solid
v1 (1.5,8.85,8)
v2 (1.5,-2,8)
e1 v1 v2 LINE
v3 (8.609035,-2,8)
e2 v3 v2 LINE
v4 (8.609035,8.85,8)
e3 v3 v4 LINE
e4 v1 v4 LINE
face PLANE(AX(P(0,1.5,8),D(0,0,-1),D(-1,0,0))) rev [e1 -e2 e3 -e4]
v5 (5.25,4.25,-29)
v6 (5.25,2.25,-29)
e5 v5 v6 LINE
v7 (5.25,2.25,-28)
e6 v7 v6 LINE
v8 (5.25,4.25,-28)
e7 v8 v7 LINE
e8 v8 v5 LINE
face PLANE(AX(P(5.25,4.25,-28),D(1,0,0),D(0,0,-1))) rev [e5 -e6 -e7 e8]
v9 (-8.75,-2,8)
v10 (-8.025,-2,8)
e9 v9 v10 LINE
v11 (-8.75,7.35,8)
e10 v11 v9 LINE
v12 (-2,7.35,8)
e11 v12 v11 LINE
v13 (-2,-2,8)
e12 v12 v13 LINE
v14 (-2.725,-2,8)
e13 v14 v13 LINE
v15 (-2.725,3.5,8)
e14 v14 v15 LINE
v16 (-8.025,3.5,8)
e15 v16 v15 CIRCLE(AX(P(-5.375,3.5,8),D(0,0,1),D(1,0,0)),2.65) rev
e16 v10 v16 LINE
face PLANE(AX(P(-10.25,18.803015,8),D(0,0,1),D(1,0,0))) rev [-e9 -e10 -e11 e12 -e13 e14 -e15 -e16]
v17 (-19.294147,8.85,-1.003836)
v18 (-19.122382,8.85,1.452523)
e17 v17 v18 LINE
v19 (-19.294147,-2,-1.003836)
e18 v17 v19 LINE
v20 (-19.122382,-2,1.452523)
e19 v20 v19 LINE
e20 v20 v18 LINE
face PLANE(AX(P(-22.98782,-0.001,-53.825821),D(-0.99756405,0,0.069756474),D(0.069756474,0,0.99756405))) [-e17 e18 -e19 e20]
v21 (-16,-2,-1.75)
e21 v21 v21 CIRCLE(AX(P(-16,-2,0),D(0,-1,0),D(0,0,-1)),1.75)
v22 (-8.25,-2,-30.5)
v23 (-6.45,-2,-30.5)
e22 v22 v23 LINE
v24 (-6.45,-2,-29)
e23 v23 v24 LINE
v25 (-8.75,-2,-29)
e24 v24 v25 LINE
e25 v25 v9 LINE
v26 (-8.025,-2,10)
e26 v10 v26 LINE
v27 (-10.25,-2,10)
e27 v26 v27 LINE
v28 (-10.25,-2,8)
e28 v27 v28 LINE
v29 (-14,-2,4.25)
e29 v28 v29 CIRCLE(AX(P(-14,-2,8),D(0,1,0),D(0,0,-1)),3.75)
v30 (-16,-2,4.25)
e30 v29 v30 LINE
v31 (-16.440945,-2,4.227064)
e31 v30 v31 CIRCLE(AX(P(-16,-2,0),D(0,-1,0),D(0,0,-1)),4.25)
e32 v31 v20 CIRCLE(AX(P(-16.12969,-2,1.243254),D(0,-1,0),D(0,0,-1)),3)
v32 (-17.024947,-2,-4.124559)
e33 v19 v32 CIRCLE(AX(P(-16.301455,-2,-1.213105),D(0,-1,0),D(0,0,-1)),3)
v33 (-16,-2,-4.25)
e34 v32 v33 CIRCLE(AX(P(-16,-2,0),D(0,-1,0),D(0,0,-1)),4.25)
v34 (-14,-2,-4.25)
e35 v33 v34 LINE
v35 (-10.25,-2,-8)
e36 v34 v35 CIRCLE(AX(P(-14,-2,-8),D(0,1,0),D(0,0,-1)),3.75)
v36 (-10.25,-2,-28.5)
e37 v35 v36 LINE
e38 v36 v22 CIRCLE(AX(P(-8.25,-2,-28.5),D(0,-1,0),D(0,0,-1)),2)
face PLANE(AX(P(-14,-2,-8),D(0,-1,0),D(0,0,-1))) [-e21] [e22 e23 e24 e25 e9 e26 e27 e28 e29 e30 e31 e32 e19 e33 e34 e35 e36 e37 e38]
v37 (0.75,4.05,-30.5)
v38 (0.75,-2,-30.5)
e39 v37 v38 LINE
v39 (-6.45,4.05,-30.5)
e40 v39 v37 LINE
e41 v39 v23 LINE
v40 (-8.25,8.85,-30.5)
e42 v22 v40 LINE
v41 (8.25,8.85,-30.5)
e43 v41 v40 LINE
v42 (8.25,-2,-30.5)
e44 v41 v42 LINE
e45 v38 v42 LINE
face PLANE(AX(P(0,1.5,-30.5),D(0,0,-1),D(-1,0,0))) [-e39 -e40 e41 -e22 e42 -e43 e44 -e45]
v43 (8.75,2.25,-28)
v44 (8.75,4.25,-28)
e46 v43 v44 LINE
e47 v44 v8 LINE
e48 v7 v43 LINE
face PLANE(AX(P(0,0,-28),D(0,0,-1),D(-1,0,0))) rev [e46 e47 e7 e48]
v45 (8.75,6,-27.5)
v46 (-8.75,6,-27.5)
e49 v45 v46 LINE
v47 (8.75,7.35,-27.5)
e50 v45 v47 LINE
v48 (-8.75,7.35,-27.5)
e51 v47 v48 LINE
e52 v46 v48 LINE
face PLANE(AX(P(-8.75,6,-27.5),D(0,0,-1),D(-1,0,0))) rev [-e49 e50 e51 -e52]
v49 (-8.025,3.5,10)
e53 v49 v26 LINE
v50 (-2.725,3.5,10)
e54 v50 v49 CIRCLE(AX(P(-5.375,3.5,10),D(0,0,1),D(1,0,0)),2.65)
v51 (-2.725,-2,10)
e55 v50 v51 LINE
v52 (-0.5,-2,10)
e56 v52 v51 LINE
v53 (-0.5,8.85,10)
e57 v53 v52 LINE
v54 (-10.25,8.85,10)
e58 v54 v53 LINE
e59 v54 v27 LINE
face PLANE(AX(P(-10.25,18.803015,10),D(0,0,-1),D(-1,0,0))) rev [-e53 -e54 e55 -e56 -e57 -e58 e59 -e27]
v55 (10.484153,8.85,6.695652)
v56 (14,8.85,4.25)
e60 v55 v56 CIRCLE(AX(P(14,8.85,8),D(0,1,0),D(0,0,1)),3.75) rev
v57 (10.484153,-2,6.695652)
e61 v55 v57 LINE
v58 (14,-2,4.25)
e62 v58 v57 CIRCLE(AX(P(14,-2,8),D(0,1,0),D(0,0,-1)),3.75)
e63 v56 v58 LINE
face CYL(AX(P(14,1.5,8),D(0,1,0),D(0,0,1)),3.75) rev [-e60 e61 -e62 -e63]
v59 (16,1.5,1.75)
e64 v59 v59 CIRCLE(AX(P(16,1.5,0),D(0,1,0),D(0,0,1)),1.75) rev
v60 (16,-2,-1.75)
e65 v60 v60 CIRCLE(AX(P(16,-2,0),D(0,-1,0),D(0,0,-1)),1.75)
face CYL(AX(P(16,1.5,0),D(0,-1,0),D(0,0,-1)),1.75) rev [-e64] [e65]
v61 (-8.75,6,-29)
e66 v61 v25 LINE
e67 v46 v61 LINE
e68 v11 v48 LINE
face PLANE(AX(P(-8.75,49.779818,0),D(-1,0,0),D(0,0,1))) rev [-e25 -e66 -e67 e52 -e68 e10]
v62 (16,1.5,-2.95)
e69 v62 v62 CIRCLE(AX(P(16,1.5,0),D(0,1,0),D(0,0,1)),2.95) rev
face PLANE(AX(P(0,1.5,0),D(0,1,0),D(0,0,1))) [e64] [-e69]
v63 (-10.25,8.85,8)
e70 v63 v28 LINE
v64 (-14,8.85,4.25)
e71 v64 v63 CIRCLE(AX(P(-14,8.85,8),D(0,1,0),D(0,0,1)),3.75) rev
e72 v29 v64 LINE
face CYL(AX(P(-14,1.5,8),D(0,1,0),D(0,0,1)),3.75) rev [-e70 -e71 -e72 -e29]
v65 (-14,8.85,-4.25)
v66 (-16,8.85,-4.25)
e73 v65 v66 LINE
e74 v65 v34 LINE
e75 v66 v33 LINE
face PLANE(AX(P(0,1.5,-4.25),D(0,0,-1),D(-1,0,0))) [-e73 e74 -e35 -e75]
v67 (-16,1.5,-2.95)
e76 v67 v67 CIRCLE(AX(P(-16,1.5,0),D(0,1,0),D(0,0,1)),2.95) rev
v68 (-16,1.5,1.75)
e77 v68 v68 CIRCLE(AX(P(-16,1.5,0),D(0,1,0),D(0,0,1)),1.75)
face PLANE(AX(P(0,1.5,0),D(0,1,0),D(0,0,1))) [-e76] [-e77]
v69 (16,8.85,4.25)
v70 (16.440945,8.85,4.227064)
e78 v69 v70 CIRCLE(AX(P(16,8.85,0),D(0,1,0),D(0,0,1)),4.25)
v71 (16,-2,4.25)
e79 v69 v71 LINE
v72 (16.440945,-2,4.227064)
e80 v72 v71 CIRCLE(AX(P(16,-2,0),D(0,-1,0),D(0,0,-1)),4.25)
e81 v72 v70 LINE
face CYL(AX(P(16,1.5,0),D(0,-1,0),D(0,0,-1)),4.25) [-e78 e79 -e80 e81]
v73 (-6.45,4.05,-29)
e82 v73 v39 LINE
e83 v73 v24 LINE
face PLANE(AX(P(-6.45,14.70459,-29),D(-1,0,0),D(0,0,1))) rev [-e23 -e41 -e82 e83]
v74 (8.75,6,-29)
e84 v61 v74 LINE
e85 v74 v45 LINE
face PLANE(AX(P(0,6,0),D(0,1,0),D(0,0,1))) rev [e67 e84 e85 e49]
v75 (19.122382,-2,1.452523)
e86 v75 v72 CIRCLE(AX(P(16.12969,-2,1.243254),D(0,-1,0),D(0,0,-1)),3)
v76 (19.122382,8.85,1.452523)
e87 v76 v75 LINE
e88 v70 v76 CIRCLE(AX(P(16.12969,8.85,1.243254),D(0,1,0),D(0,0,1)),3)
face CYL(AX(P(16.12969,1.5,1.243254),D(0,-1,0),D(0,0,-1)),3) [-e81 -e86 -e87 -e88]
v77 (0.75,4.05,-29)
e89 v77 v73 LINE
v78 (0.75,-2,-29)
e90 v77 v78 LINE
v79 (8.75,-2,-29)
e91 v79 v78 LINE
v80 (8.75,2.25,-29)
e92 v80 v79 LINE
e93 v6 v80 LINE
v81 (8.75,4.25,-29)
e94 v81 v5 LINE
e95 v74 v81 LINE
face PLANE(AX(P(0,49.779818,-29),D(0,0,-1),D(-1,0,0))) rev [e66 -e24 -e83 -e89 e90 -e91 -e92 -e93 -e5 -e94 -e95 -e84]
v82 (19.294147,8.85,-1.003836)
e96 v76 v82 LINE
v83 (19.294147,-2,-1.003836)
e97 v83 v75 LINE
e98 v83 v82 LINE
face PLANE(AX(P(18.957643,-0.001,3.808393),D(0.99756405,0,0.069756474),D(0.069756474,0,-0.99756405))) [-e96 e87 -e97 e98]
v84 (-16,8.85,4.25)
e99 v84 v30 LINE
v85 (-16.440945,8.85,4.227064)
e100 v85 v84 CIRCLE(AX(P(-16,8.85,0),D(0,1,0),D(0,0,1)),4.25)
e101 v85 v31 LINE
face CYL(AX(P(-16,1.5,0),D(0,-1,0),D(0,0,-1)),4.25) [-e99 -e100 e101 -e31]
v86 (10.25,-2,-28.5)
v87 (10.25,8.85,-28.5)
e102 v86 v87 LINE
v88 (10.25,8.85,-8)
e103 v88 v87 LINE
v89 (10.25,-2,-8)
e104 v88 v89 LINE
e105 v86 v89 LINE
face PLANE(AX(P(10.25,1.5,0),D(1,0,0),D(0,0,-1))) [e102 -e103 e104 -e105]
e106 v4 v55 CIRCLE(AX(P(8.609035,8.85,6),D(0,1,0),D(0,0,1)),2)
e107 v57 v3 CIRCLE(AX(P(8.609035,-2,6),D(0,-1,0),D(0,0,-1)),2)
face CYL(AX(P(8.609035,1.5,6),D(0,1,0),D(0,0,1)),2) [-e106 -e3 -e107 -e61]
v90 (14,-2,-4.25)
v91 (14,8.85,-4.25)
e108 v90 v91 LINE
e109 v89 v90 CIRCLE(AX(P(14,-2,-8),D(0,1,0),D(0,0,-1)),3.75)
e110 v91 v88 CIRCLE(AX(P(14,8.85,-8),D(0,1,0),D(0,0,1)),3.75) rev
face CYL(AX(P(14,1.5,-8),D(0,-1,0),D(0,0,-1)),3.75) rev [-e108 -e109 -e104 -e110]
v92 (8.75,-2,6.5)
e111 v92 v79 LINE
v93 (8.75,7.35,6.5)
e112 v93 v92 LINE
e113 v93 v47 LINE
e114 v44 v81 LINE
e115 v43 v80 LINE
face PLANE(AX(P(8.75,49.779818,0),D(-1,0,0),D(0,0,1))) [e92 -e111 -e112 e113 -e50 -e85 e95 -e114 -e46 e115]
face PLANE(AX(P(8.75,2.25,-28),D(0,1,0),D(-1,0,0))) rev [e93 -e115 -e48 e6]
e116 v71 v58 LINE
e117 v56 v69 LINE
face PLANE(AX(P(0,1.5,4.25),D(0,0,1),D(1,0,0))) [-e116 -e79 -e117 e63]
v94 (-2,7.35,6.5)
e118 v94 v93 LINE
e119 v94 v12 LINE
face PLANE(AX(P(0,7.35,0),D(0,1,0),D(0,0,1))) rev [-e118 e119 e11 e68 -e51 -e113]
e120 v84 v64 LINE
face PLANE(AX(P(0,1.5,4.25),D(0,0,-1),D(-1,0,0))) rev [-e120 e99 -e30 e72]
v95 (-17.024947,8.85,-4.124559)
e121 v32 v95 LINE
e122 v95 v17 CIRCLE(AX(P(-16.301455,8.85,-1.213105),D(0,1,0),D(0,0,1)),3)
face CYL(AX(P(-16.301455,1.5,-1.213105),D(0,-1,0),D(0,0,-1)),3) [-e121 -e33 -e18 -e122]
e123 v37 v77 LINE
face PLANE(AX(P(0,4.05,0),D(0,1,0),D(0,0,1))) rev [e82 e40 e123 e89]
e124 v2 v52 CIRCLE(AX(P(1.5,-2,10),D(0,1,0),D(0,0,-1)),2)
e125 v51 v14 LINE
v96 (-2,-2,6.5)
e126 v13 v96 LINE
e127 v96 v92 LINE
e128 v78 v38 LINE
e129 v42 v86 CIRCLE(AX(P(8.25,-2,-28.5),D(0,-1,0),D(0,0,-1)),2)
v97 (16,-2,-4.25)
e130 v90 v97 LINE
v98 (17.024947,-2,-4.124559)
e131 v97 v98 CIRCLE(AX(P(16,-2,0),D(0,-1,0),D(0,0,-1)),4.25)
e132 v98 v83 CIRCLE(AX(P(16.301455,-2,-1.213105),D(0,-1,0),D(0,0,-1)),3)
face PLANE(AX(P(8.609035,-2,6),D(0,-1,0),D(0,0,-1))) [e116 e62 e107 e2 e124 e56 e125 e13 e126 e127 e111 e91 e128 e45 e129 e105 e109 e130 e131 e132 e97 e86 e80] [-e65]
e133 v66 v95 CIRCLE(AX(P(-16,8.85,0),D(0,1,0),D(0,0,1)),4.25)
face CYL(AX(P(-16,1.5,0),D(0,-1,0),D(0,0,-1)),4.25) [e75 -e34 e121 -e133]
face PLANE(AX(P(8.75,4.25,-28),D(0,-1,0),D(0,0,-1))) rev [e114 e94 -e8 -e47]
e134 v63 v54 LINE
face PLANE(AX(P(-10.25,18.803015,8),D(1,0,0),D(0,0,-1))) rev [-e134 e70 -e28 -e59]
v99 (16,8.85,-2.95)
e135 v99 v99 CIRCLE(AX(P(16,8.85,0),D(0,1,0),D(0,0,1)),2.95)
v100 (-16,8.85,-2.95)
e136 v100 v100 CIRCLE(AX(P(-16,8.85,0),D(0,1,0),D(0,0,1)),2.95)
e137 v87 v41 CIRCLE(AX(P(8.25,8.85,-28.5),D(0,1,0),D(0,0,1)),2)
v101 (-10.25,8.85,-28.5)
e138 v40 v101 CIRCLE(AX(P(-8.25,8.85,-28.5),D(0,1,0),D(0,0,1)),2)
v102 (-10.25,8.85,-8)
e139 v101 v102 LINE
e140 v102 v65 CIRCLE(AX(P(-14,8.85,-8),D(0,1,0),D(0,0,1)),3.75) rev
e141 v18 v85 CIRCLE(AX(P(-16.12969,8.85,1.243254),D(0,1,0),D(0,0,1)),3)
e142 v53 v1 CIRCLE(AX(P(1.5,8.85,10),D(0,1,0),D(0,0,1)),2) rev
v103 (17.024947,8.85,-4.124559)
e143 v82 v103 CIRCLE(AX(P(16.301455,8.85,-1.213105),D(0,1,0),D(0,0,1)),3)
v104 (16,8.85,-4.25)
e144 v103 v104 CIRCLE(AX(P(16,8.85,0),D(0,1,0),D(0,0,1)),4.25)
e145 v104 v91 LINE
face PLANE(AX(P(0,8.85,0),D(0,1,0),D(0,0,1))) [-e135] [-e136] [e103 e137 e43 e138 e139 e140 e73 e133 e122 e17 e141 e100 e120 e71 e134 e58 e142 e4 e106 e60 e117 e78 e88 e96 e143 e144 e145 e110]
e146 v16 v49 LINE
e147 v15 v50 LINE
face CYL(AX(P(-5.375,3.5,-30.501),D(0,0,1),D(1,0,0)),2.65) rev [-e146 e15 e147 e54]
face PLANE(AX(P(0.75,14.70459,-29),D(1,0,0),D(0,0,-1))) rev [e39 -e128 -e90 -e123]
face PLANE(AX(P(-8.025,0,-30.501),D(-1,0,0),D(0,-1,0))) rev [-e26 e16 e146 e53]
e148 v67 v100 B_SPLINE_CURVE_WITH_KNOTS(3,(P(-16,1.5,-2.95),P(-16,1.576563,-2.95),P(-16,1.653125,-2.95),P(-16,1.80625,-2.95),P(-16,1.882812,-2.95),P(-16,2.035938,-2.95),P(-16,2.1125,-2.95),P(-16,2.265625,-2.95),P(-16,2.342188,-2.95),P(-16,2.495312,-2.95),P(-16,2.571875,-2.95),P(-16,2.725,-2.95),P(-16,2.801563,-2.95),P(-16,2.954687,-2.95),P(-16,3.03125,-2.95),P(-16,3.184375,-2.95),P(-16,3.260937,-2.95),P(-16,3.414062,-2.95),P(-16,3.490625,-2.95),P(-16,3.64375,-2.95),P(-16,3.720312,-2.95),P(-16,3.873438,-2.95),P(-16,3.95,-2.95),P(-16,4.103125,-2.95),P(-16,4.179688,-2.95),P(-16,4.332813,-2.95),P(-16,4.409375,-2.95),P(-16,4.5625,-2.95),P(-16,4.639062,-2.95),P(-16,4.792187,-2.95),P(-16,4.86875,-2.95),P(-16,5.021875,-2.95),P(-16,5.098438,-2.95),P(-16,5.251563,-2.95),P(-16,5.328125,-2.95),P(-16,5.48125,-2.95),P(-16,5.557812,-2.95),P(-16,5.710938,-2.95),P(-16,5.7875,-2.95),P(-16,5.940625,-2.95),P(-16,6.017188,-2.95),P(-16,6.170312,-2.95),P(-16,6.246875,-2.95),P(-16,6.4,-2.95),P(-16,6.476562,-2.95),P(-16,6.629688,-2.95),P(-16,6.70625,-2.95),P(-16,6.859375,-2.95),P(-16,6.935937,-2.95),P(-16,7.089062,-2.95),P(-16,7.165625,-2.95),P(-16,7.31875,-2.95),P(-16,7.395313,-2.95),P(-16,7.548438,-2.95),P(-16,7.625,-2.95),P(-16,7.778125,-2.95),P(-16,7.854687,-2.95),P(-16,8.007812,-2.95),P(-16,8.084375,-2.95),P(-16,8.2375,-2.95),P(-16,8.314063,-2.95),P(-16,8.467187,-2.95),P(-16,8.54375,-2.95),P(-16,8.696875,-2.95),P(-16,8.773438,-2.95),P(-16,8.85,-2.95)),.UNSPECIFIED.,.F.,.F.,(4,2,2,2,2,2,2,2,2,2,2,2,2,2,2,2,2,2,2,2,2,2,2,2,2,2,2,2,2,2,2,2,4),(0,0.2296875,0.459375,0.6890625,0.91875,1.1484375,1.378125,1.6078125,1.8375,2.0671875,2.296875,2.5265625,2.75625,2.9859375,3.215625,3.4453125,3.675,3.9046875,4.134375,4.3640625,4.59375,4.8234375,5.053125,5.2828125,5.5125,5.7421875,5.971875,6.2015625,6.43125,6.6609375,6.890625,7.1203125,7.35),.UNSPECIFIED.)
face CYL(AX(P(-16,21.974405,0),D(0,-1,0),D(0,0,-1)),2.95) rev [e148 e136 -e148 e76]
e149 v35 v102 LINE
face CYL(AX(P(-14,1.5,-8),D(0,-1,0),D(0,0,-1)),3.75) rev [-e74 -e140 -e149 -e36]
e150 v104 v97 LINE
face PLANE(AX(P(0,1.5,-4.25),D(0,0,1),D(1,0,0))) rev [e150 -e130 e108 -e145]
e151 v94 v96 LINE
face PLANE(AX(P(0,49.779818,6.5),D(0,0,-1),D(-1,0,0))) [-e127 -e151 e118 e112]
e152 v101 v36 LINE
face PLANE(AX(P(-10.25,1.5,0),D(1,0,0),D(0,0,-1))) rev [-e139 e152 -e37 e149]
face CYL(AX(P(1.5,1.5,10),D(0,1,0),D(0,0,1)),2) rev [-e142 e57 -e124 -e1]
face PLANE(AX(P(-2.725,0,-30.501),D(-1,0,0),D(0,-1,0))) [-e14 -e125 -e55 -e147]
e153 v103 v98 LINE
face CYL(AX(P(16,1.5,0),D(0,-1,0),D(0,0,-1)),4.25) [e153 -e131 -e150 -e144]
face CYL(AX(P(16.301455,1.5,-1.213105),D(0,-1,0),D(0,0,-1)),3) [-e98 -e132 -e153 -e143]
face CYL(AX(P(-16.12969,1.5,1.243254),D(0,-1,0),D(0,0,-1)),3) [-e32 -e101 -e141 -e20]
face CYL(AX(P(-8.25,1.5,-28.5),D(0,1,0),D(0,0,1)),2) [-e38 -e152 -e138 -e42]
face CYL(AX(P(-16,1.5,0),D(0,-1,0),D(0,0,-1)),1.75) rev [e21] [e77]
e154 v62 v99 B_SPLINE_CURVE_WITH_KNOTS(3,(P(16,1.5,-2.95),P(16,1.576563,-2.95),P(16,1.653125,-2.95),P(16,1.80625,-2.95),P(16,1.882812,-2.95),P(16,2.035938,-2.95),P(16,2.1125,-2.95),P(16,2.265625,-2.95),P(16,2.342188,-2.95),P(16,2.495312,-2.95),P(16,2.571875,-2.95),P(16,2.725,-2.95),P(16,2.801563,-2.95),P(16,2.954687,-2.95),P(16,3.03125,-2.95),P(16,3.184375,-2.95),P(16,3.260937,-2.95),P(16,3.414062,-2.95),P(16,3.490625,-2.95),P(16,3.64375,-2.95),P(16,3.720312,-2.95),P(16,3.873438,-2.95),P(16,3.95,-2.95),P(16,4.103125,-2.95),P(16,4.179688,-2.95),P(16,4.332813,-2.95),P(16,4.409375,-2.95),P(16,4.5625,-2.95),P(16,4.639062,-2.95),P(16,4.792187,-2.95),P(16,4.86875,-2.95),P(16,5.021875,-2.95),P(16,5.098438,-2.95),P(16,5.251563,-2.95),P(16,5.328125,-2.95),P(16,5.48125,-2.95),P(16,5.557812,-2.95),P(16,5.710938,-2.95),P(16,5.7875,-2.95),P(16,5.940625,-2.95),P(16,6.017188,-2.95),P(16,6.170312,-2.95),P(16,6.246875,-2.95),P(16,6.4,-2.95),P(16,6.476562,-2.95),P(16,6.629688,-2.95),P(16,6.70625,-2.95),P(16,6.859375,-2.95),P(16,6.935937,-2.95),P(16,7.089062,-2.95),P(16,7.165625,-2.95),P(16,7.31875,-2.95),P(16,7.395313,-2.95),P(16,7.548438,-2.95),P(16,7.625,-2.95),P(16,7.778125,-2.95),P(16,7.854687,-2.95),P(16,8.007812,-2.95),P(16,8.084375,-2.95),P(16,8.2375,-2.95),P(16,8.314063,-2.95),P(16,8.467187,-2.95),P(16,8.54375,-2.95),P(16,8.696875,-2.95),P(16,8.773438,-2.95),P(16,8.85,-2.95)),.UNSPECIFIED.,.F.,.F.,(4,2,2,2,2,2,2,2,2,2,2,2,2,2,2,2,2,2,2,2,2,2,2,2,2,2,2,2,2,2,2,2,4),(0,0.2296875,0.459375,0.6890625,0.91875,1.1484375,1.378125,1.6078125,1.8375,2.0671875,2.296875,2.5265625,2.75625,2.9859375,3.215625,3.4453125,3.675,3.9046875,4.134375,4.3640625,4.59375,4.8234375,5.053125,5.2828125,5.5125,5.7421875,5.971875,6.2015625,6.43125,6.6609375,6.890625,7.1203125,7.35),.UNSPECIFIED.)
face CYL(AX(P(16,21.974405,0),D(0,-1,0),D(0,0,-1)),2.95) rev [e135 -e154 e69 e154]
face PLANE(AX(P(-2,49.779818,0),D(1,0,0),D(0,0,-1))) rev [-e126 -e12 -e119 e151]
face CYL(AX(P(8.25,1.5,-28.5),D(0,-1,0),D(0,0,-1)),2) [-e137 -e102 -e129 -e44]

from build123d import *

# Parameters (mm, degrees)
SKETCH1_W           = 20.5
SKETCH1_H           = 38.5
SKETCH1_R           = 4.25
SKETCH1_R_2         = 1.75
BOSS_EXTRUDE1_DEPTH = 1.5
SKETCH2_W           = 20.5
SKETCH2_H           = 38.5
BOSS_EXTRUDE2_DEPTH = 7.35
SKETCH3_W           = 17.5
SKETCH3_H           = 35.5
SKETCH3_W_2         = 6.75
SKETCH3_H_2         = 1.5
CUT_EXTRUDE1_DEPTH  = 7.35
SKETCH4_W           = 7.2
SKETCH4_H           = 1.5
CUT_EXTRUDE2_DEPTH  = 4.05
SKETCH6_W           = 17.5
SKETCH6_H           = 1.5
BOSS_EXTRUDE3_DEPTH = 1.35
SKETCH7_W           = 3.5
SKETCH7_H           = 2
BOSS_EXTRUDE4_DEPTH = 1
SKETCH8_R           = 2.95
BOSS_EXTRUDE5_DEPTH = 7.35
FILLET2_R           = 3.75
CUT_EXTRUDE4_START  = -8.85
CUT_EXTRUDE4_DEPTH  = 8.85
FILLET5_R           = 3
SKETCH10_W          = 9.75
SKETCH10_H          = 2
BOSS_EXTRUDE6_DEPTH = 8.85
CUT_EXTRUDE5_REACH  = 47.729
FILLET4_R           = 2
BOSS_EXTRUDE7_START = 2
SKETCH12_R          = 1.75
BOSS_EXTRUDE7_DEPTH = 2


with BuildPart() as part:
    # Sketch1 → Boss-Extrude1 (new body)
    # profile 1 of 5: a face of its own
    with BuildSketch(Plane(origin=(0, 0, 0), x_dir=(1, 0, 0), z_dir=(0, 1, 0))):
        with Locations((0, 11.25)):
            Rectangle(SKETCH1_W, SKETCH1_H)
    # profile 2 of 5: a face of its own
    with BuildSketch(Plane(origin=(0, 0, 0), x_dir=(1, 0, 0), z_dir=(0, 1, 0))):
        with BuildLine():
            Line((-10.25, -4.25), (-10.25, 4.25))
            Line((-10.25, 4.25), (-16, 4.25))
            ThreePointArc((-16, 4.25), (-12.99479618, 3.00520382), (-11.75, 0))
            ThreePointArc((-11.75, 0), (-12.99479618, -3.00520382), (-16, -4.25))
            Line((-16, -4.25), (-10.25, -4.25))
        make_face()
    # profile 3 of 5: a face of its own
    with BuildSketch(Plane(origin=(0, 0, 0), x_dir=(1, 0, 0), z_dir=(0, 1, 0))):
        with Locations((-16, 0)):
            Circle(SKETCH1_R)
        with Locations(Location((-16, 0, 0), (0, 0, 270))):
            Circle(SKETCH1_R_2, mode=Mode.SUBTRACT)
    # profile 4 of 5: a face of its own
    with BuildSketch(Plane(origin=(0, 0, 0), x_dir=(1, 0, 0), z_dir=(0, 1, 0))):
        with BuildLine():
            Line((16, 4.25), (10.25, 4.25))
            Line((10.25, 4.25), (10.25, -4.25))
            Line((10.25, -4.25), (16, -4.25))
            ThreePointArc((16, -4.25), (11.75, 0), (16, 4.25))
        make_face()
    # profile 5 of 5: a face of its own
    with BuildSketch(Plane(origin=(0, 0, 0), x_dir=(1, 0, 0), z_dir=(0, 1, 0))):
        with Locations((16, 0)):
            Circle(SKETCH1_R)
        with Locations(Location((16, 0, 0), (0, 0, 270))):
            Circle(SKETCH1_R_2, mode=Mode.SUBTRACT)
    extrude(amount=BOSS_EXTRUDE1_DEPTH)

    # Sketch2 → Boss-Extrude2 (add)
    with BuildSketch(Plane(origin=(0, 1.5, 0), x_dir=(1, 0, 0), z_dir=(0, 1, 0))):
        with Locations((0, 11.25)):
            Rectangle(SKETCH2_W, SKETCH2_H)
    extrude(amount=BOSS_EXTRUDE2_DEPTH)

    # Sketch3 → Cut-Extrude1 (cut)
    with BuildSketch(Plane.XZ):
        with Locations((0, -11.25)):
            Rectangle(SKETCH3_W, SKETCH3_H)
        with Locations((-5.375, 7.25)):
            Rectangle(SKETCH3_W_2, SKETCH3_H_2)
    extrude(amount=-CUT_EXTRUDE1_DEPTH, mode=Mode.SUBTRACT)

    # Sketch4 → Cut-Extrude2 (cut)
    with BuildSketch(Plane.XZ):
        with Locations((-2.85, -29.75)):
            Rectangle(SKETCH4_W, SKETCH4_H)
    extrude(amount=-CUT_EXTRUDE2_DEPTH, mode=Mode.SUBTRACT)

    # Sketch6 → Boss-Extrude3 (add)
    with BuildSketch(Plane.XZ.offset(-7.35)):
        with Locations((0, -28.25)):
            Rectangle(SKETCH6_W, SKETCH6_H)
    extrude(amount=BOSS_EXTRUDE3_DEPTH)

    # Sketch7 → Boss-Extrude4 (add)
    with BuildSketch(Plane.XY.offset(-29)):
        with Locations((7, 3.25)):
            Rectangle(SKETCH7_W, SKETCH7_H)
    extrude(amount=BOSS_EXTRUDE4_DEPTH)

    # Sketch8 → Boss-Extrude5 (add)
    # profile 1 of 2: a face of its own
    with BuildSketch(Plane(origin=(0, 1.5, 0), x_dir=(1, 0, 0), z_dir=(0, 1, 0))):
        with BuildLine():
            Line((-10.25, -4.25), (-10.25, 4.25))
            Line((-10.25, 4.25), (-16, 4.25))
            ThreePointArc((-16, 4.25), (-20.25, 0), (-16, -4.25))
            Line((-16, -4.25), (-10.25, -4.25))
        make_face()
        with Locations(Location((-16, 0, 0), (0, 0, 90))):
            Circle(SKETCH8_R, mode=Mode.SUBTRACT)
    # profile 2 of 2: a face of its own
    with BuildSketch(Plane(origin=(0, 1.5, 0), x_dir=(1, 0, 0), z_dir=(0, 1, 0))):
        with BuildLine():
            Line((10.25, 4.25), (10.25, -4.25))
            Line((10.25, -4.25), (16, -4.25))
            ThreePointArc((16, -4.25), (20.25, 0), (16, 4.25))
            Line((16, 4.25), (10.25, 4.25))
        make_face()
        with Locations(Location((16, 0, 0), (0, 0, 90))):
            Circle(SKETCH8_R, mode=Mode.SUBTRACT)
    extrude(amount=BOSS_EXTRUDE5_DEPTH)

    # Fillet2
    fillet2_edges = [part.edges().sort_by_distance(p)[0] for p in [
        (10.25, 4.425, -4.25),
        (10.25, 4.425, 4.25),
        (-10.25, 4.425, 4.25),
        (-10.25, 4.425, -4.25),
    ]]
    fillet(fillet2_edges, radius=FILLET2_R - 0.0001)  # a hair under: the kernel refuses the full size

    # Sketch9 → Cut-Extrude4 (cut)
    with BuildSketch(Plane(origin=(0, 8.85, 0), x_dir=(1, 0, 0), z_dir=(0, 1, 0)).offset(CUT_EXTRUDE4_START)):
        with BuildLine():
            Line((-24.982948352, 53.686308531), (-20.952771504, -3.947905519))
            ThreePointArc((-20.952771504, -3.947905519), (-19.171836931, -8.143524448), (-15.185360396, -10.353264474))
            Line((-15.185360396, -10.353264474), (-1.215537244, -12.816521212))
            ThreePointArc((-1.215537244, -12.816521212), (0, -12.922866941), (1.215537244, -12.816521212))
            Line((1.215537244, -12.816521212), (15.185360396, -10.353264474))
            ThreePointArc((15.185360396, -10.353264474), (19.171836931, -8.143524448), (20.952771504, -3.947905519))
            Line((20.952771504, -3.947905519), (24.982948352, 53.686308531))
            ThreePointArc((24.982948352, 53.686308531), (24.995735789, 53.930307371), (25, 54.174603847))
            Line((25, 54.174603847), (25, 107.825396153))
            ThreePointArc((25, 107.825396153), (24.995735789, 108.069692629), (24.982948352, 108.313691469))
            Line((24.982948352, 108.313691469), (20.952771504, 165.947905519))
            ThreePointArc((20.952771504, 165.947905519), (19.171836931, 170.143524448), (15.185360396, 172.353264474))
            Line((15.185360396, 172.353264474), (1.215537244, 174.816521212))
            ThreePointArc((1.215537244, 174.816521212), (0, 174.922866941), (-1.215537244, 174.816521212))
            Line((-1.215537244, 174.816521212), (-15.185360396, 172.353264474))
            ThreePointArc((-15.185360396, 172.353264474), (-19.171836931, 170.143524448), (-20.952771504, 165.947905519))
            Line((-20.952771504, 165.947905519), (-24.982948352, 108.313691469))
            ThreePointArc((-24.982948352, 108.313691469), (-24.995735789, 108.069692629), (-25, 107.825396153))
            Line((-25, 107.825396153), (-25, 54.174603847))
            ThreePointArc((-25, 54.174603847), (-24.995735789, 53.930307371), (-24.982948352, 53.686308531))
        make_face()
        with BuildLine():
            Line((-18.957643404, 165.808392572), (-22.987820251, 108.174178521))
            ThreePointArc((-22.987820251, 108.174178521), (-22.996954135, 107.999893636), (-23, 107.825396153))
            Line((-23, 107.825396153), (-23, 54.174603847))
            ThreePointArc((-23, 54.174603847), (-22.996954135, 54.000106364), (-22.987820251, 53.825821479))
            Line((-22.987820251, 53.825821479), (-18.957643404, -3.808392572))
            ThreePointArc((-18.957643404, -3.808392572), (-17.68554728, -6.805263235), (-14.838064041, -8.383648968))
            Line((-14.838064041, -8.383648968), (-0.868240888, -10.846905706))
            ThreePointArc((-0.868240888, -10.846905706), (0, -10.922866941), (0.868240888, -10.846905706))
            Line((0.868240888, -10.846905706), (14.838064041, -8.383648968))
            ThreePointArc((14.838064041, -8.383648968), (17.68554728, -6.805263235), (18.957643404, -3.808392572))
            Line((18.957643404, -3.808392572), (22.987820251, 53.825821479))
            ThreePointArc((22.987820251, 53.825821479), (22.996954135, 54.000106364), (23, 54.174603847))
            Line((23, 54.174603847), (23, 107.825396153))
            ThreePointArc((23, 107.825396153), (22.996954135, 107.999893636), (22.987820251, 108.174178521))
            Line((22.987820251, 108.174178521), (18.957643404, 165.808392572))
            ThreePointArc((18.957643404, 165.808392572), (17.68554728, 168.805263235), (14.838064041, 170.383648968))
            Line((14.838064041, 170.383648968), (0.868240888, 172.846905706))
            ThreePointArc((0.868240888, 172.846905706), (0, 172.922866941), (-0.868240888, 172.846905706))
            Line((-0.868240888, 172.846905706), (-14.838064041, 170.383648968))
            ThreePointArc((-14.838064041, 170.383648968), (-17.68554728, 168.805263235), (-18.957643404, 165.808392572))
        make_face(mode=Mode.SUBTRACT)
    extrude(amount=CUT_EXTRUDE4_DEPTH, mode=Mode.SUBTRACT)

    # Fillet5
    fillet5_edges = [part.edges().sort_by_distance(p)[0] for p in [
        (-19.402072162, 4.425, -2.547234776),
        (-19.014456867, 4.425, 2.995922195),
        (19.014456867, 4.425, 2.995922195),
        (19.402072162, 4.425, -2.547234776),
    ]]
    fillet(fillet5_edges, radius=FILLET5_R)

    # Sketch10 → Boss-Extrude6 (add)
    with BuildSketch(Plane(origin=(0, 0, 0), x_dir=(1, 0, 0), z_dir=(0, 1, 0))):
        with Locations((-5.375, -9)):
            Rectangle(SKETCH10_W, SKETCH10_H)
    extrude(amount=BOSS_EXTRUDE6_DEPTH)

    # Sketch11 → Cut-Extrude5 (cut, up to next)
    with BuildSketch(Plane.XY.offset(10), mode=Mode.PRIVATE) as cut_extrude5_sk1:
        with BuildLine():
            ThreePointArc((-2.725, 3.5), (-3.50116703, 5.37383297), (-5.375, 6.15))
            Line((-5.375, 6.15), (-5.375, 0.85))
            ThreePointArc((-5.375, 0.85), (-3.50116703, 1.62616703), (-2.725, 3.5))
        make_face()
    cut_extrude5_tool1 = extrude(cut_extrude5_sk1.sketch, amount=-CUT_EXTRUDE5_REACH, mode=Mode.PRIVATE) & part.part
    # Sketch11 → Cut-Extrude5 (cut, up to next)
    with BuildSketch(Plane.XY.offset(10), mode=Mode.PRIVATE) as cut_extrude5_sk2:
        with BuildLine():
            Line((-5.375, 0.85), (-5.375, 6.15))
            ThreePointArc((-5.375, 6.15), (-7.24883297, 5.37383297), (-8.025, 3.5))
            ThreePointArc((-8.025, 3.5), (-7.24883297, 1.62616703), (-5.375, 0.85))
        make_face()
    cut_extrude5_tool2 = extrude(cut_extrude5_sk2.sketch, amount=-CUT_EXTRUDE5_REACH, mode=Mode.PRIVATE) & part.part
    # Sketch11 → Cut-Extrude5 (cut, up to next)
    with BuildSketch(Plane.XY.offset(10), mode=Mode.PRIVATE) as cut_extrude5_sk3:
        with BuildLine():
            ThreePointArc((-2.725, 3.5), (-3.50116703, 5.37383297), (-5.375, 6.15))
            Line((-5.375, 6.15), (-5.375, 0.85))
            ThreePointArc((-5.375, 0.85), (-3.50116703, 1.62616703), (-2.725, 3.5))
        make_face()
    cut_extrude5_tool3 = extrude(cut_extrude5_sk3.sketch, amount=-CUT_EXTRUDE5_REACH, mode=Mode.PRIVATE) & part.part
    # Sketch11 → Cut-Extrude5 (cut, up to next)
    with BuildSketch(Plane.XY.offset(10), mode=Mode.PRIVATE) as cut_extrude5_sk4:
        with BuildLine():
            Line((-5.375, 0.85), (-5.375, 6.15))
            ThreePointArc((-5.375, 6.15), (-7.24883297, 5.37383297), (-8.025, 3.5))
            ThreePointArc((-8.025, 3.5), (-7.24883297, 1.62616703), (-5.375, 0.85))
        make_face()
    cut_extrude5_tool4 = extrude(cut_extrude5_sk4.sketch, amount=-CUT_EXTRUDE5_REACH, mode=Mode.PRIVATE) & part.part
    # Sketch11 → Cut-Extrude5 (cut, up to next)
    with BuildSketch(Plane.XY.offset(10), mode=Mode.PRIVATE) as cut_extrude5_sk5:
        with BuildLine():
            Line((-5.375, 0), (-5.375, 0.85))
            ThreePointArc((-5.375, 0.85), (-7.24883297, 1.62616703), (-8.025, 3.5))
            Line((-8.025, 3.5), (-8.025, 0))
            Line((-8.025, 0), (-5.375, 0))
        make_face()
    cut_extrude5_tool5 = extrude(cut_extrude5_sk5.sketch, amount=-CUT_EXTRUDE5_REACH, mode=Mode.PRIVATE) & part.part
    # Sketch11 → Cut-Extrude5 (cut, up to next)
    with BuildSketch(Plane.XY.offset(10), mode=Mode.PRIVATE) as cut_extrude5_sk6:
        with BuildLine():
            ThreePointArc((-2.725, 3.5), (-3.50116703, 1.62616703), (-5.375, 0.85))
            Line((-5.375, 0.85), (-5.375, 0))
            Line((-5.375, 0), (-2.725, 0))
            Line((-2.725, 0), (-2.725, 3.5))
        make_face()
    cut_extrude5_tool6 = extrude(cut_extrude5_sk6.sketch, amount=-CUT_EXTRUDE5_REACH, mode=Mode.PRIVATE) & part.part
    add(cut_extrude5_tool1.solids().sort_by_distance((-4.250305, 3.5, 10))[0], mode=Mode.SUBTRACT)
    add(cut_extrude5_tool2.solids().sort_by_distance((-6.499695, 3.5, 10))[0], mode=Mode.SUBTRACT)
    add(cut_extrude5_tool3.solids().sort_by_distance((-4.250305, 3.5, 10))[0], mode=Mode.SUBTRACT)
    add(cut_extrude5_tool4.solids().sort_by_distance((-6.499695, 3.5, 10))[0], mode=Mode.SUBTRACT)
    add(cut_extrude5_tool5.solids().sort_by_distance((-6.993859, 0.832642, 10))[0], mode=Mode.SUBTRACT)
    add(cut_extrude5_tool6.solids().sort_by_distance((-3.756141, 0.832642, 10))[0], mode=Mode.SUBTRACT)

    # Fillet4
    fillet4_edges = [part.edges().sort_by_distance(p)[0] for p in [
        (10.25, 4.425, 8),
        (10.25, 4.425, -30.5),
        (-10.25, 4.425, -30.5),
        (-0.5, 4.425, 8),
    ]]
    fillet(fillet4_edges, radius=FILLET4_R - 0.0001)  # a hair under: the kernel refuses the full size

    # Sketch12 → Boss-Extrude7 (add)
    # profile 1 of 2: a face of its own
    with BuildSketch(Plane.XZ.offset(BOSS_EXTRUDE7_START)):
        with BuildLine():
            Line((8.609035337, 8), (1.5, 8))
            ThreePointArc((1.5, 8), (0.085786438, 8.585786438), (-0.5, 10))
            Line((-0.5, 10), (-2.725, 10))
            Line((-2.725, 10), (-2.725, 8))
            Line((-2.725, 8), (-2, 8))
            Line((-2, 8), (-2, 6.5))
            Line((-2, 6.5), (8.75, 6.5))
            Line((8.75, 6.5), (8.75, -29))
            Line((8.75, -29), (0.75, -29))
            Line((0.75, -29), (0.75, -30.5))
            Line((0.75, -30.5), (8.25, -30.5))
            ThreePointArc((8.25, -30.5), (9.664213562, -29.914213562), (10.25, -28.5))
            Line((10.25, -28.5), (10.25, -8))
            ThreePointArc((10.25, -8), (11.348349571, -5.348349571), (14, -4.25))
            Line((14, -4.25), (16, -4.25))
            ThreePointArc((16, -4.25), (16.516297471, -4.218523073), (17.024947197, -4.124558551))
            ThreePointArc((17.024947197, -4.124558551), (18.727817289, -2.97740881), (19.294147209, -1.003836035))
            Line((19.294147209, -1.003836035), (19.122381821, 1.452523454))
            ThreePointArc((19.122381821, 1.452523454), (18.286895141, 3.328071663), (16.440944878, 4.227063711))
            ThreePointArc((16.440944878, 4.227063711), (16.220770502, 4.244262054), (16, 4.25))
            Line((16, 4.25), (14, 4.25))
            ThreePointArc((14, 4.25), (11.858599097, 4.921542241), (10.484153481, 6.695652174))
            ThreePointArc((10.484153481, 6.695652174), (9.751115818, 7.641844138), (8.609035337, 8))
        make_face()
        with Locations(Location((16, 0, 0), (0, 0, 270))):
            Circle(SKETCH12_R, mode=Mode.SUBTRACT)
    # profile 2 of 2: a face of its own
    with BuildSketch(Plane.XZ.offset(BOSS_EXTRUDE7_START)):
        with BuildLine():
            Line((-10.25, -8), (-10.25, -28.5))
            ThreePointArc((-10.25, -28.5), (-9.664213562, -29.914213562), (-8.25, -30.5))
            Line((-8.25, -30.5), (-6.45, -30.5))
            Line((-6.45, -30.5), (-6.45, -29))
            Line((-6.45, -29), (-8.75, -29))
            Line((-8.75, -29), (-8.75, 8))
            Line((-8.75, 8), (-8.025, 8))
            Line((-8.025, 8), (-8.025, 10))
            Line((-8.025, 10), (-10.25, 10))
            Line((-10.25, 10), (-10.25, 8))
            ThreePointArc((-10.25, 8), (-11.348349571, 5.348349571), (-14, 4.25))
            Line((-14, 4.25), (-16, 4.25))
            ThreePointArc((-16, 4.25), (-16.220770502, 4.244262054), (-16.440944878, 4.227063711))
            ThreePointArc((-16.440944878, 4.227063711), (-18.286895141, 3.328071663), (-19.122381821, 1.452523454))
            Line((-19.122381821, 1.452523454), (-19.294147209, -1.003836035))
            ThreePointArc((-19.294147209, -1.003836035), (-18.727817289, -2.97740881), (-17.024947197, -4.124558551))
            ThreePointArc((-17.024947197, -4.124558551), (-16.516297471, -4.218523073), (-16, -4.25))
            Line((-16, -4.25), (-14, -4.25))
            ThreePointArc((-14, -4.25), (-11.348349571, -5.348349571), (-10.25, -8))
        make_face()
        with Locations(Location((-16, 0, 0), (0, 0, 270))):
            Circle(SKETCH12_R, mode=Mode.SUBTRACT)
    extrude(amount=-BOSS_EXTRUDE7_DEPTH)


solid = part.part
